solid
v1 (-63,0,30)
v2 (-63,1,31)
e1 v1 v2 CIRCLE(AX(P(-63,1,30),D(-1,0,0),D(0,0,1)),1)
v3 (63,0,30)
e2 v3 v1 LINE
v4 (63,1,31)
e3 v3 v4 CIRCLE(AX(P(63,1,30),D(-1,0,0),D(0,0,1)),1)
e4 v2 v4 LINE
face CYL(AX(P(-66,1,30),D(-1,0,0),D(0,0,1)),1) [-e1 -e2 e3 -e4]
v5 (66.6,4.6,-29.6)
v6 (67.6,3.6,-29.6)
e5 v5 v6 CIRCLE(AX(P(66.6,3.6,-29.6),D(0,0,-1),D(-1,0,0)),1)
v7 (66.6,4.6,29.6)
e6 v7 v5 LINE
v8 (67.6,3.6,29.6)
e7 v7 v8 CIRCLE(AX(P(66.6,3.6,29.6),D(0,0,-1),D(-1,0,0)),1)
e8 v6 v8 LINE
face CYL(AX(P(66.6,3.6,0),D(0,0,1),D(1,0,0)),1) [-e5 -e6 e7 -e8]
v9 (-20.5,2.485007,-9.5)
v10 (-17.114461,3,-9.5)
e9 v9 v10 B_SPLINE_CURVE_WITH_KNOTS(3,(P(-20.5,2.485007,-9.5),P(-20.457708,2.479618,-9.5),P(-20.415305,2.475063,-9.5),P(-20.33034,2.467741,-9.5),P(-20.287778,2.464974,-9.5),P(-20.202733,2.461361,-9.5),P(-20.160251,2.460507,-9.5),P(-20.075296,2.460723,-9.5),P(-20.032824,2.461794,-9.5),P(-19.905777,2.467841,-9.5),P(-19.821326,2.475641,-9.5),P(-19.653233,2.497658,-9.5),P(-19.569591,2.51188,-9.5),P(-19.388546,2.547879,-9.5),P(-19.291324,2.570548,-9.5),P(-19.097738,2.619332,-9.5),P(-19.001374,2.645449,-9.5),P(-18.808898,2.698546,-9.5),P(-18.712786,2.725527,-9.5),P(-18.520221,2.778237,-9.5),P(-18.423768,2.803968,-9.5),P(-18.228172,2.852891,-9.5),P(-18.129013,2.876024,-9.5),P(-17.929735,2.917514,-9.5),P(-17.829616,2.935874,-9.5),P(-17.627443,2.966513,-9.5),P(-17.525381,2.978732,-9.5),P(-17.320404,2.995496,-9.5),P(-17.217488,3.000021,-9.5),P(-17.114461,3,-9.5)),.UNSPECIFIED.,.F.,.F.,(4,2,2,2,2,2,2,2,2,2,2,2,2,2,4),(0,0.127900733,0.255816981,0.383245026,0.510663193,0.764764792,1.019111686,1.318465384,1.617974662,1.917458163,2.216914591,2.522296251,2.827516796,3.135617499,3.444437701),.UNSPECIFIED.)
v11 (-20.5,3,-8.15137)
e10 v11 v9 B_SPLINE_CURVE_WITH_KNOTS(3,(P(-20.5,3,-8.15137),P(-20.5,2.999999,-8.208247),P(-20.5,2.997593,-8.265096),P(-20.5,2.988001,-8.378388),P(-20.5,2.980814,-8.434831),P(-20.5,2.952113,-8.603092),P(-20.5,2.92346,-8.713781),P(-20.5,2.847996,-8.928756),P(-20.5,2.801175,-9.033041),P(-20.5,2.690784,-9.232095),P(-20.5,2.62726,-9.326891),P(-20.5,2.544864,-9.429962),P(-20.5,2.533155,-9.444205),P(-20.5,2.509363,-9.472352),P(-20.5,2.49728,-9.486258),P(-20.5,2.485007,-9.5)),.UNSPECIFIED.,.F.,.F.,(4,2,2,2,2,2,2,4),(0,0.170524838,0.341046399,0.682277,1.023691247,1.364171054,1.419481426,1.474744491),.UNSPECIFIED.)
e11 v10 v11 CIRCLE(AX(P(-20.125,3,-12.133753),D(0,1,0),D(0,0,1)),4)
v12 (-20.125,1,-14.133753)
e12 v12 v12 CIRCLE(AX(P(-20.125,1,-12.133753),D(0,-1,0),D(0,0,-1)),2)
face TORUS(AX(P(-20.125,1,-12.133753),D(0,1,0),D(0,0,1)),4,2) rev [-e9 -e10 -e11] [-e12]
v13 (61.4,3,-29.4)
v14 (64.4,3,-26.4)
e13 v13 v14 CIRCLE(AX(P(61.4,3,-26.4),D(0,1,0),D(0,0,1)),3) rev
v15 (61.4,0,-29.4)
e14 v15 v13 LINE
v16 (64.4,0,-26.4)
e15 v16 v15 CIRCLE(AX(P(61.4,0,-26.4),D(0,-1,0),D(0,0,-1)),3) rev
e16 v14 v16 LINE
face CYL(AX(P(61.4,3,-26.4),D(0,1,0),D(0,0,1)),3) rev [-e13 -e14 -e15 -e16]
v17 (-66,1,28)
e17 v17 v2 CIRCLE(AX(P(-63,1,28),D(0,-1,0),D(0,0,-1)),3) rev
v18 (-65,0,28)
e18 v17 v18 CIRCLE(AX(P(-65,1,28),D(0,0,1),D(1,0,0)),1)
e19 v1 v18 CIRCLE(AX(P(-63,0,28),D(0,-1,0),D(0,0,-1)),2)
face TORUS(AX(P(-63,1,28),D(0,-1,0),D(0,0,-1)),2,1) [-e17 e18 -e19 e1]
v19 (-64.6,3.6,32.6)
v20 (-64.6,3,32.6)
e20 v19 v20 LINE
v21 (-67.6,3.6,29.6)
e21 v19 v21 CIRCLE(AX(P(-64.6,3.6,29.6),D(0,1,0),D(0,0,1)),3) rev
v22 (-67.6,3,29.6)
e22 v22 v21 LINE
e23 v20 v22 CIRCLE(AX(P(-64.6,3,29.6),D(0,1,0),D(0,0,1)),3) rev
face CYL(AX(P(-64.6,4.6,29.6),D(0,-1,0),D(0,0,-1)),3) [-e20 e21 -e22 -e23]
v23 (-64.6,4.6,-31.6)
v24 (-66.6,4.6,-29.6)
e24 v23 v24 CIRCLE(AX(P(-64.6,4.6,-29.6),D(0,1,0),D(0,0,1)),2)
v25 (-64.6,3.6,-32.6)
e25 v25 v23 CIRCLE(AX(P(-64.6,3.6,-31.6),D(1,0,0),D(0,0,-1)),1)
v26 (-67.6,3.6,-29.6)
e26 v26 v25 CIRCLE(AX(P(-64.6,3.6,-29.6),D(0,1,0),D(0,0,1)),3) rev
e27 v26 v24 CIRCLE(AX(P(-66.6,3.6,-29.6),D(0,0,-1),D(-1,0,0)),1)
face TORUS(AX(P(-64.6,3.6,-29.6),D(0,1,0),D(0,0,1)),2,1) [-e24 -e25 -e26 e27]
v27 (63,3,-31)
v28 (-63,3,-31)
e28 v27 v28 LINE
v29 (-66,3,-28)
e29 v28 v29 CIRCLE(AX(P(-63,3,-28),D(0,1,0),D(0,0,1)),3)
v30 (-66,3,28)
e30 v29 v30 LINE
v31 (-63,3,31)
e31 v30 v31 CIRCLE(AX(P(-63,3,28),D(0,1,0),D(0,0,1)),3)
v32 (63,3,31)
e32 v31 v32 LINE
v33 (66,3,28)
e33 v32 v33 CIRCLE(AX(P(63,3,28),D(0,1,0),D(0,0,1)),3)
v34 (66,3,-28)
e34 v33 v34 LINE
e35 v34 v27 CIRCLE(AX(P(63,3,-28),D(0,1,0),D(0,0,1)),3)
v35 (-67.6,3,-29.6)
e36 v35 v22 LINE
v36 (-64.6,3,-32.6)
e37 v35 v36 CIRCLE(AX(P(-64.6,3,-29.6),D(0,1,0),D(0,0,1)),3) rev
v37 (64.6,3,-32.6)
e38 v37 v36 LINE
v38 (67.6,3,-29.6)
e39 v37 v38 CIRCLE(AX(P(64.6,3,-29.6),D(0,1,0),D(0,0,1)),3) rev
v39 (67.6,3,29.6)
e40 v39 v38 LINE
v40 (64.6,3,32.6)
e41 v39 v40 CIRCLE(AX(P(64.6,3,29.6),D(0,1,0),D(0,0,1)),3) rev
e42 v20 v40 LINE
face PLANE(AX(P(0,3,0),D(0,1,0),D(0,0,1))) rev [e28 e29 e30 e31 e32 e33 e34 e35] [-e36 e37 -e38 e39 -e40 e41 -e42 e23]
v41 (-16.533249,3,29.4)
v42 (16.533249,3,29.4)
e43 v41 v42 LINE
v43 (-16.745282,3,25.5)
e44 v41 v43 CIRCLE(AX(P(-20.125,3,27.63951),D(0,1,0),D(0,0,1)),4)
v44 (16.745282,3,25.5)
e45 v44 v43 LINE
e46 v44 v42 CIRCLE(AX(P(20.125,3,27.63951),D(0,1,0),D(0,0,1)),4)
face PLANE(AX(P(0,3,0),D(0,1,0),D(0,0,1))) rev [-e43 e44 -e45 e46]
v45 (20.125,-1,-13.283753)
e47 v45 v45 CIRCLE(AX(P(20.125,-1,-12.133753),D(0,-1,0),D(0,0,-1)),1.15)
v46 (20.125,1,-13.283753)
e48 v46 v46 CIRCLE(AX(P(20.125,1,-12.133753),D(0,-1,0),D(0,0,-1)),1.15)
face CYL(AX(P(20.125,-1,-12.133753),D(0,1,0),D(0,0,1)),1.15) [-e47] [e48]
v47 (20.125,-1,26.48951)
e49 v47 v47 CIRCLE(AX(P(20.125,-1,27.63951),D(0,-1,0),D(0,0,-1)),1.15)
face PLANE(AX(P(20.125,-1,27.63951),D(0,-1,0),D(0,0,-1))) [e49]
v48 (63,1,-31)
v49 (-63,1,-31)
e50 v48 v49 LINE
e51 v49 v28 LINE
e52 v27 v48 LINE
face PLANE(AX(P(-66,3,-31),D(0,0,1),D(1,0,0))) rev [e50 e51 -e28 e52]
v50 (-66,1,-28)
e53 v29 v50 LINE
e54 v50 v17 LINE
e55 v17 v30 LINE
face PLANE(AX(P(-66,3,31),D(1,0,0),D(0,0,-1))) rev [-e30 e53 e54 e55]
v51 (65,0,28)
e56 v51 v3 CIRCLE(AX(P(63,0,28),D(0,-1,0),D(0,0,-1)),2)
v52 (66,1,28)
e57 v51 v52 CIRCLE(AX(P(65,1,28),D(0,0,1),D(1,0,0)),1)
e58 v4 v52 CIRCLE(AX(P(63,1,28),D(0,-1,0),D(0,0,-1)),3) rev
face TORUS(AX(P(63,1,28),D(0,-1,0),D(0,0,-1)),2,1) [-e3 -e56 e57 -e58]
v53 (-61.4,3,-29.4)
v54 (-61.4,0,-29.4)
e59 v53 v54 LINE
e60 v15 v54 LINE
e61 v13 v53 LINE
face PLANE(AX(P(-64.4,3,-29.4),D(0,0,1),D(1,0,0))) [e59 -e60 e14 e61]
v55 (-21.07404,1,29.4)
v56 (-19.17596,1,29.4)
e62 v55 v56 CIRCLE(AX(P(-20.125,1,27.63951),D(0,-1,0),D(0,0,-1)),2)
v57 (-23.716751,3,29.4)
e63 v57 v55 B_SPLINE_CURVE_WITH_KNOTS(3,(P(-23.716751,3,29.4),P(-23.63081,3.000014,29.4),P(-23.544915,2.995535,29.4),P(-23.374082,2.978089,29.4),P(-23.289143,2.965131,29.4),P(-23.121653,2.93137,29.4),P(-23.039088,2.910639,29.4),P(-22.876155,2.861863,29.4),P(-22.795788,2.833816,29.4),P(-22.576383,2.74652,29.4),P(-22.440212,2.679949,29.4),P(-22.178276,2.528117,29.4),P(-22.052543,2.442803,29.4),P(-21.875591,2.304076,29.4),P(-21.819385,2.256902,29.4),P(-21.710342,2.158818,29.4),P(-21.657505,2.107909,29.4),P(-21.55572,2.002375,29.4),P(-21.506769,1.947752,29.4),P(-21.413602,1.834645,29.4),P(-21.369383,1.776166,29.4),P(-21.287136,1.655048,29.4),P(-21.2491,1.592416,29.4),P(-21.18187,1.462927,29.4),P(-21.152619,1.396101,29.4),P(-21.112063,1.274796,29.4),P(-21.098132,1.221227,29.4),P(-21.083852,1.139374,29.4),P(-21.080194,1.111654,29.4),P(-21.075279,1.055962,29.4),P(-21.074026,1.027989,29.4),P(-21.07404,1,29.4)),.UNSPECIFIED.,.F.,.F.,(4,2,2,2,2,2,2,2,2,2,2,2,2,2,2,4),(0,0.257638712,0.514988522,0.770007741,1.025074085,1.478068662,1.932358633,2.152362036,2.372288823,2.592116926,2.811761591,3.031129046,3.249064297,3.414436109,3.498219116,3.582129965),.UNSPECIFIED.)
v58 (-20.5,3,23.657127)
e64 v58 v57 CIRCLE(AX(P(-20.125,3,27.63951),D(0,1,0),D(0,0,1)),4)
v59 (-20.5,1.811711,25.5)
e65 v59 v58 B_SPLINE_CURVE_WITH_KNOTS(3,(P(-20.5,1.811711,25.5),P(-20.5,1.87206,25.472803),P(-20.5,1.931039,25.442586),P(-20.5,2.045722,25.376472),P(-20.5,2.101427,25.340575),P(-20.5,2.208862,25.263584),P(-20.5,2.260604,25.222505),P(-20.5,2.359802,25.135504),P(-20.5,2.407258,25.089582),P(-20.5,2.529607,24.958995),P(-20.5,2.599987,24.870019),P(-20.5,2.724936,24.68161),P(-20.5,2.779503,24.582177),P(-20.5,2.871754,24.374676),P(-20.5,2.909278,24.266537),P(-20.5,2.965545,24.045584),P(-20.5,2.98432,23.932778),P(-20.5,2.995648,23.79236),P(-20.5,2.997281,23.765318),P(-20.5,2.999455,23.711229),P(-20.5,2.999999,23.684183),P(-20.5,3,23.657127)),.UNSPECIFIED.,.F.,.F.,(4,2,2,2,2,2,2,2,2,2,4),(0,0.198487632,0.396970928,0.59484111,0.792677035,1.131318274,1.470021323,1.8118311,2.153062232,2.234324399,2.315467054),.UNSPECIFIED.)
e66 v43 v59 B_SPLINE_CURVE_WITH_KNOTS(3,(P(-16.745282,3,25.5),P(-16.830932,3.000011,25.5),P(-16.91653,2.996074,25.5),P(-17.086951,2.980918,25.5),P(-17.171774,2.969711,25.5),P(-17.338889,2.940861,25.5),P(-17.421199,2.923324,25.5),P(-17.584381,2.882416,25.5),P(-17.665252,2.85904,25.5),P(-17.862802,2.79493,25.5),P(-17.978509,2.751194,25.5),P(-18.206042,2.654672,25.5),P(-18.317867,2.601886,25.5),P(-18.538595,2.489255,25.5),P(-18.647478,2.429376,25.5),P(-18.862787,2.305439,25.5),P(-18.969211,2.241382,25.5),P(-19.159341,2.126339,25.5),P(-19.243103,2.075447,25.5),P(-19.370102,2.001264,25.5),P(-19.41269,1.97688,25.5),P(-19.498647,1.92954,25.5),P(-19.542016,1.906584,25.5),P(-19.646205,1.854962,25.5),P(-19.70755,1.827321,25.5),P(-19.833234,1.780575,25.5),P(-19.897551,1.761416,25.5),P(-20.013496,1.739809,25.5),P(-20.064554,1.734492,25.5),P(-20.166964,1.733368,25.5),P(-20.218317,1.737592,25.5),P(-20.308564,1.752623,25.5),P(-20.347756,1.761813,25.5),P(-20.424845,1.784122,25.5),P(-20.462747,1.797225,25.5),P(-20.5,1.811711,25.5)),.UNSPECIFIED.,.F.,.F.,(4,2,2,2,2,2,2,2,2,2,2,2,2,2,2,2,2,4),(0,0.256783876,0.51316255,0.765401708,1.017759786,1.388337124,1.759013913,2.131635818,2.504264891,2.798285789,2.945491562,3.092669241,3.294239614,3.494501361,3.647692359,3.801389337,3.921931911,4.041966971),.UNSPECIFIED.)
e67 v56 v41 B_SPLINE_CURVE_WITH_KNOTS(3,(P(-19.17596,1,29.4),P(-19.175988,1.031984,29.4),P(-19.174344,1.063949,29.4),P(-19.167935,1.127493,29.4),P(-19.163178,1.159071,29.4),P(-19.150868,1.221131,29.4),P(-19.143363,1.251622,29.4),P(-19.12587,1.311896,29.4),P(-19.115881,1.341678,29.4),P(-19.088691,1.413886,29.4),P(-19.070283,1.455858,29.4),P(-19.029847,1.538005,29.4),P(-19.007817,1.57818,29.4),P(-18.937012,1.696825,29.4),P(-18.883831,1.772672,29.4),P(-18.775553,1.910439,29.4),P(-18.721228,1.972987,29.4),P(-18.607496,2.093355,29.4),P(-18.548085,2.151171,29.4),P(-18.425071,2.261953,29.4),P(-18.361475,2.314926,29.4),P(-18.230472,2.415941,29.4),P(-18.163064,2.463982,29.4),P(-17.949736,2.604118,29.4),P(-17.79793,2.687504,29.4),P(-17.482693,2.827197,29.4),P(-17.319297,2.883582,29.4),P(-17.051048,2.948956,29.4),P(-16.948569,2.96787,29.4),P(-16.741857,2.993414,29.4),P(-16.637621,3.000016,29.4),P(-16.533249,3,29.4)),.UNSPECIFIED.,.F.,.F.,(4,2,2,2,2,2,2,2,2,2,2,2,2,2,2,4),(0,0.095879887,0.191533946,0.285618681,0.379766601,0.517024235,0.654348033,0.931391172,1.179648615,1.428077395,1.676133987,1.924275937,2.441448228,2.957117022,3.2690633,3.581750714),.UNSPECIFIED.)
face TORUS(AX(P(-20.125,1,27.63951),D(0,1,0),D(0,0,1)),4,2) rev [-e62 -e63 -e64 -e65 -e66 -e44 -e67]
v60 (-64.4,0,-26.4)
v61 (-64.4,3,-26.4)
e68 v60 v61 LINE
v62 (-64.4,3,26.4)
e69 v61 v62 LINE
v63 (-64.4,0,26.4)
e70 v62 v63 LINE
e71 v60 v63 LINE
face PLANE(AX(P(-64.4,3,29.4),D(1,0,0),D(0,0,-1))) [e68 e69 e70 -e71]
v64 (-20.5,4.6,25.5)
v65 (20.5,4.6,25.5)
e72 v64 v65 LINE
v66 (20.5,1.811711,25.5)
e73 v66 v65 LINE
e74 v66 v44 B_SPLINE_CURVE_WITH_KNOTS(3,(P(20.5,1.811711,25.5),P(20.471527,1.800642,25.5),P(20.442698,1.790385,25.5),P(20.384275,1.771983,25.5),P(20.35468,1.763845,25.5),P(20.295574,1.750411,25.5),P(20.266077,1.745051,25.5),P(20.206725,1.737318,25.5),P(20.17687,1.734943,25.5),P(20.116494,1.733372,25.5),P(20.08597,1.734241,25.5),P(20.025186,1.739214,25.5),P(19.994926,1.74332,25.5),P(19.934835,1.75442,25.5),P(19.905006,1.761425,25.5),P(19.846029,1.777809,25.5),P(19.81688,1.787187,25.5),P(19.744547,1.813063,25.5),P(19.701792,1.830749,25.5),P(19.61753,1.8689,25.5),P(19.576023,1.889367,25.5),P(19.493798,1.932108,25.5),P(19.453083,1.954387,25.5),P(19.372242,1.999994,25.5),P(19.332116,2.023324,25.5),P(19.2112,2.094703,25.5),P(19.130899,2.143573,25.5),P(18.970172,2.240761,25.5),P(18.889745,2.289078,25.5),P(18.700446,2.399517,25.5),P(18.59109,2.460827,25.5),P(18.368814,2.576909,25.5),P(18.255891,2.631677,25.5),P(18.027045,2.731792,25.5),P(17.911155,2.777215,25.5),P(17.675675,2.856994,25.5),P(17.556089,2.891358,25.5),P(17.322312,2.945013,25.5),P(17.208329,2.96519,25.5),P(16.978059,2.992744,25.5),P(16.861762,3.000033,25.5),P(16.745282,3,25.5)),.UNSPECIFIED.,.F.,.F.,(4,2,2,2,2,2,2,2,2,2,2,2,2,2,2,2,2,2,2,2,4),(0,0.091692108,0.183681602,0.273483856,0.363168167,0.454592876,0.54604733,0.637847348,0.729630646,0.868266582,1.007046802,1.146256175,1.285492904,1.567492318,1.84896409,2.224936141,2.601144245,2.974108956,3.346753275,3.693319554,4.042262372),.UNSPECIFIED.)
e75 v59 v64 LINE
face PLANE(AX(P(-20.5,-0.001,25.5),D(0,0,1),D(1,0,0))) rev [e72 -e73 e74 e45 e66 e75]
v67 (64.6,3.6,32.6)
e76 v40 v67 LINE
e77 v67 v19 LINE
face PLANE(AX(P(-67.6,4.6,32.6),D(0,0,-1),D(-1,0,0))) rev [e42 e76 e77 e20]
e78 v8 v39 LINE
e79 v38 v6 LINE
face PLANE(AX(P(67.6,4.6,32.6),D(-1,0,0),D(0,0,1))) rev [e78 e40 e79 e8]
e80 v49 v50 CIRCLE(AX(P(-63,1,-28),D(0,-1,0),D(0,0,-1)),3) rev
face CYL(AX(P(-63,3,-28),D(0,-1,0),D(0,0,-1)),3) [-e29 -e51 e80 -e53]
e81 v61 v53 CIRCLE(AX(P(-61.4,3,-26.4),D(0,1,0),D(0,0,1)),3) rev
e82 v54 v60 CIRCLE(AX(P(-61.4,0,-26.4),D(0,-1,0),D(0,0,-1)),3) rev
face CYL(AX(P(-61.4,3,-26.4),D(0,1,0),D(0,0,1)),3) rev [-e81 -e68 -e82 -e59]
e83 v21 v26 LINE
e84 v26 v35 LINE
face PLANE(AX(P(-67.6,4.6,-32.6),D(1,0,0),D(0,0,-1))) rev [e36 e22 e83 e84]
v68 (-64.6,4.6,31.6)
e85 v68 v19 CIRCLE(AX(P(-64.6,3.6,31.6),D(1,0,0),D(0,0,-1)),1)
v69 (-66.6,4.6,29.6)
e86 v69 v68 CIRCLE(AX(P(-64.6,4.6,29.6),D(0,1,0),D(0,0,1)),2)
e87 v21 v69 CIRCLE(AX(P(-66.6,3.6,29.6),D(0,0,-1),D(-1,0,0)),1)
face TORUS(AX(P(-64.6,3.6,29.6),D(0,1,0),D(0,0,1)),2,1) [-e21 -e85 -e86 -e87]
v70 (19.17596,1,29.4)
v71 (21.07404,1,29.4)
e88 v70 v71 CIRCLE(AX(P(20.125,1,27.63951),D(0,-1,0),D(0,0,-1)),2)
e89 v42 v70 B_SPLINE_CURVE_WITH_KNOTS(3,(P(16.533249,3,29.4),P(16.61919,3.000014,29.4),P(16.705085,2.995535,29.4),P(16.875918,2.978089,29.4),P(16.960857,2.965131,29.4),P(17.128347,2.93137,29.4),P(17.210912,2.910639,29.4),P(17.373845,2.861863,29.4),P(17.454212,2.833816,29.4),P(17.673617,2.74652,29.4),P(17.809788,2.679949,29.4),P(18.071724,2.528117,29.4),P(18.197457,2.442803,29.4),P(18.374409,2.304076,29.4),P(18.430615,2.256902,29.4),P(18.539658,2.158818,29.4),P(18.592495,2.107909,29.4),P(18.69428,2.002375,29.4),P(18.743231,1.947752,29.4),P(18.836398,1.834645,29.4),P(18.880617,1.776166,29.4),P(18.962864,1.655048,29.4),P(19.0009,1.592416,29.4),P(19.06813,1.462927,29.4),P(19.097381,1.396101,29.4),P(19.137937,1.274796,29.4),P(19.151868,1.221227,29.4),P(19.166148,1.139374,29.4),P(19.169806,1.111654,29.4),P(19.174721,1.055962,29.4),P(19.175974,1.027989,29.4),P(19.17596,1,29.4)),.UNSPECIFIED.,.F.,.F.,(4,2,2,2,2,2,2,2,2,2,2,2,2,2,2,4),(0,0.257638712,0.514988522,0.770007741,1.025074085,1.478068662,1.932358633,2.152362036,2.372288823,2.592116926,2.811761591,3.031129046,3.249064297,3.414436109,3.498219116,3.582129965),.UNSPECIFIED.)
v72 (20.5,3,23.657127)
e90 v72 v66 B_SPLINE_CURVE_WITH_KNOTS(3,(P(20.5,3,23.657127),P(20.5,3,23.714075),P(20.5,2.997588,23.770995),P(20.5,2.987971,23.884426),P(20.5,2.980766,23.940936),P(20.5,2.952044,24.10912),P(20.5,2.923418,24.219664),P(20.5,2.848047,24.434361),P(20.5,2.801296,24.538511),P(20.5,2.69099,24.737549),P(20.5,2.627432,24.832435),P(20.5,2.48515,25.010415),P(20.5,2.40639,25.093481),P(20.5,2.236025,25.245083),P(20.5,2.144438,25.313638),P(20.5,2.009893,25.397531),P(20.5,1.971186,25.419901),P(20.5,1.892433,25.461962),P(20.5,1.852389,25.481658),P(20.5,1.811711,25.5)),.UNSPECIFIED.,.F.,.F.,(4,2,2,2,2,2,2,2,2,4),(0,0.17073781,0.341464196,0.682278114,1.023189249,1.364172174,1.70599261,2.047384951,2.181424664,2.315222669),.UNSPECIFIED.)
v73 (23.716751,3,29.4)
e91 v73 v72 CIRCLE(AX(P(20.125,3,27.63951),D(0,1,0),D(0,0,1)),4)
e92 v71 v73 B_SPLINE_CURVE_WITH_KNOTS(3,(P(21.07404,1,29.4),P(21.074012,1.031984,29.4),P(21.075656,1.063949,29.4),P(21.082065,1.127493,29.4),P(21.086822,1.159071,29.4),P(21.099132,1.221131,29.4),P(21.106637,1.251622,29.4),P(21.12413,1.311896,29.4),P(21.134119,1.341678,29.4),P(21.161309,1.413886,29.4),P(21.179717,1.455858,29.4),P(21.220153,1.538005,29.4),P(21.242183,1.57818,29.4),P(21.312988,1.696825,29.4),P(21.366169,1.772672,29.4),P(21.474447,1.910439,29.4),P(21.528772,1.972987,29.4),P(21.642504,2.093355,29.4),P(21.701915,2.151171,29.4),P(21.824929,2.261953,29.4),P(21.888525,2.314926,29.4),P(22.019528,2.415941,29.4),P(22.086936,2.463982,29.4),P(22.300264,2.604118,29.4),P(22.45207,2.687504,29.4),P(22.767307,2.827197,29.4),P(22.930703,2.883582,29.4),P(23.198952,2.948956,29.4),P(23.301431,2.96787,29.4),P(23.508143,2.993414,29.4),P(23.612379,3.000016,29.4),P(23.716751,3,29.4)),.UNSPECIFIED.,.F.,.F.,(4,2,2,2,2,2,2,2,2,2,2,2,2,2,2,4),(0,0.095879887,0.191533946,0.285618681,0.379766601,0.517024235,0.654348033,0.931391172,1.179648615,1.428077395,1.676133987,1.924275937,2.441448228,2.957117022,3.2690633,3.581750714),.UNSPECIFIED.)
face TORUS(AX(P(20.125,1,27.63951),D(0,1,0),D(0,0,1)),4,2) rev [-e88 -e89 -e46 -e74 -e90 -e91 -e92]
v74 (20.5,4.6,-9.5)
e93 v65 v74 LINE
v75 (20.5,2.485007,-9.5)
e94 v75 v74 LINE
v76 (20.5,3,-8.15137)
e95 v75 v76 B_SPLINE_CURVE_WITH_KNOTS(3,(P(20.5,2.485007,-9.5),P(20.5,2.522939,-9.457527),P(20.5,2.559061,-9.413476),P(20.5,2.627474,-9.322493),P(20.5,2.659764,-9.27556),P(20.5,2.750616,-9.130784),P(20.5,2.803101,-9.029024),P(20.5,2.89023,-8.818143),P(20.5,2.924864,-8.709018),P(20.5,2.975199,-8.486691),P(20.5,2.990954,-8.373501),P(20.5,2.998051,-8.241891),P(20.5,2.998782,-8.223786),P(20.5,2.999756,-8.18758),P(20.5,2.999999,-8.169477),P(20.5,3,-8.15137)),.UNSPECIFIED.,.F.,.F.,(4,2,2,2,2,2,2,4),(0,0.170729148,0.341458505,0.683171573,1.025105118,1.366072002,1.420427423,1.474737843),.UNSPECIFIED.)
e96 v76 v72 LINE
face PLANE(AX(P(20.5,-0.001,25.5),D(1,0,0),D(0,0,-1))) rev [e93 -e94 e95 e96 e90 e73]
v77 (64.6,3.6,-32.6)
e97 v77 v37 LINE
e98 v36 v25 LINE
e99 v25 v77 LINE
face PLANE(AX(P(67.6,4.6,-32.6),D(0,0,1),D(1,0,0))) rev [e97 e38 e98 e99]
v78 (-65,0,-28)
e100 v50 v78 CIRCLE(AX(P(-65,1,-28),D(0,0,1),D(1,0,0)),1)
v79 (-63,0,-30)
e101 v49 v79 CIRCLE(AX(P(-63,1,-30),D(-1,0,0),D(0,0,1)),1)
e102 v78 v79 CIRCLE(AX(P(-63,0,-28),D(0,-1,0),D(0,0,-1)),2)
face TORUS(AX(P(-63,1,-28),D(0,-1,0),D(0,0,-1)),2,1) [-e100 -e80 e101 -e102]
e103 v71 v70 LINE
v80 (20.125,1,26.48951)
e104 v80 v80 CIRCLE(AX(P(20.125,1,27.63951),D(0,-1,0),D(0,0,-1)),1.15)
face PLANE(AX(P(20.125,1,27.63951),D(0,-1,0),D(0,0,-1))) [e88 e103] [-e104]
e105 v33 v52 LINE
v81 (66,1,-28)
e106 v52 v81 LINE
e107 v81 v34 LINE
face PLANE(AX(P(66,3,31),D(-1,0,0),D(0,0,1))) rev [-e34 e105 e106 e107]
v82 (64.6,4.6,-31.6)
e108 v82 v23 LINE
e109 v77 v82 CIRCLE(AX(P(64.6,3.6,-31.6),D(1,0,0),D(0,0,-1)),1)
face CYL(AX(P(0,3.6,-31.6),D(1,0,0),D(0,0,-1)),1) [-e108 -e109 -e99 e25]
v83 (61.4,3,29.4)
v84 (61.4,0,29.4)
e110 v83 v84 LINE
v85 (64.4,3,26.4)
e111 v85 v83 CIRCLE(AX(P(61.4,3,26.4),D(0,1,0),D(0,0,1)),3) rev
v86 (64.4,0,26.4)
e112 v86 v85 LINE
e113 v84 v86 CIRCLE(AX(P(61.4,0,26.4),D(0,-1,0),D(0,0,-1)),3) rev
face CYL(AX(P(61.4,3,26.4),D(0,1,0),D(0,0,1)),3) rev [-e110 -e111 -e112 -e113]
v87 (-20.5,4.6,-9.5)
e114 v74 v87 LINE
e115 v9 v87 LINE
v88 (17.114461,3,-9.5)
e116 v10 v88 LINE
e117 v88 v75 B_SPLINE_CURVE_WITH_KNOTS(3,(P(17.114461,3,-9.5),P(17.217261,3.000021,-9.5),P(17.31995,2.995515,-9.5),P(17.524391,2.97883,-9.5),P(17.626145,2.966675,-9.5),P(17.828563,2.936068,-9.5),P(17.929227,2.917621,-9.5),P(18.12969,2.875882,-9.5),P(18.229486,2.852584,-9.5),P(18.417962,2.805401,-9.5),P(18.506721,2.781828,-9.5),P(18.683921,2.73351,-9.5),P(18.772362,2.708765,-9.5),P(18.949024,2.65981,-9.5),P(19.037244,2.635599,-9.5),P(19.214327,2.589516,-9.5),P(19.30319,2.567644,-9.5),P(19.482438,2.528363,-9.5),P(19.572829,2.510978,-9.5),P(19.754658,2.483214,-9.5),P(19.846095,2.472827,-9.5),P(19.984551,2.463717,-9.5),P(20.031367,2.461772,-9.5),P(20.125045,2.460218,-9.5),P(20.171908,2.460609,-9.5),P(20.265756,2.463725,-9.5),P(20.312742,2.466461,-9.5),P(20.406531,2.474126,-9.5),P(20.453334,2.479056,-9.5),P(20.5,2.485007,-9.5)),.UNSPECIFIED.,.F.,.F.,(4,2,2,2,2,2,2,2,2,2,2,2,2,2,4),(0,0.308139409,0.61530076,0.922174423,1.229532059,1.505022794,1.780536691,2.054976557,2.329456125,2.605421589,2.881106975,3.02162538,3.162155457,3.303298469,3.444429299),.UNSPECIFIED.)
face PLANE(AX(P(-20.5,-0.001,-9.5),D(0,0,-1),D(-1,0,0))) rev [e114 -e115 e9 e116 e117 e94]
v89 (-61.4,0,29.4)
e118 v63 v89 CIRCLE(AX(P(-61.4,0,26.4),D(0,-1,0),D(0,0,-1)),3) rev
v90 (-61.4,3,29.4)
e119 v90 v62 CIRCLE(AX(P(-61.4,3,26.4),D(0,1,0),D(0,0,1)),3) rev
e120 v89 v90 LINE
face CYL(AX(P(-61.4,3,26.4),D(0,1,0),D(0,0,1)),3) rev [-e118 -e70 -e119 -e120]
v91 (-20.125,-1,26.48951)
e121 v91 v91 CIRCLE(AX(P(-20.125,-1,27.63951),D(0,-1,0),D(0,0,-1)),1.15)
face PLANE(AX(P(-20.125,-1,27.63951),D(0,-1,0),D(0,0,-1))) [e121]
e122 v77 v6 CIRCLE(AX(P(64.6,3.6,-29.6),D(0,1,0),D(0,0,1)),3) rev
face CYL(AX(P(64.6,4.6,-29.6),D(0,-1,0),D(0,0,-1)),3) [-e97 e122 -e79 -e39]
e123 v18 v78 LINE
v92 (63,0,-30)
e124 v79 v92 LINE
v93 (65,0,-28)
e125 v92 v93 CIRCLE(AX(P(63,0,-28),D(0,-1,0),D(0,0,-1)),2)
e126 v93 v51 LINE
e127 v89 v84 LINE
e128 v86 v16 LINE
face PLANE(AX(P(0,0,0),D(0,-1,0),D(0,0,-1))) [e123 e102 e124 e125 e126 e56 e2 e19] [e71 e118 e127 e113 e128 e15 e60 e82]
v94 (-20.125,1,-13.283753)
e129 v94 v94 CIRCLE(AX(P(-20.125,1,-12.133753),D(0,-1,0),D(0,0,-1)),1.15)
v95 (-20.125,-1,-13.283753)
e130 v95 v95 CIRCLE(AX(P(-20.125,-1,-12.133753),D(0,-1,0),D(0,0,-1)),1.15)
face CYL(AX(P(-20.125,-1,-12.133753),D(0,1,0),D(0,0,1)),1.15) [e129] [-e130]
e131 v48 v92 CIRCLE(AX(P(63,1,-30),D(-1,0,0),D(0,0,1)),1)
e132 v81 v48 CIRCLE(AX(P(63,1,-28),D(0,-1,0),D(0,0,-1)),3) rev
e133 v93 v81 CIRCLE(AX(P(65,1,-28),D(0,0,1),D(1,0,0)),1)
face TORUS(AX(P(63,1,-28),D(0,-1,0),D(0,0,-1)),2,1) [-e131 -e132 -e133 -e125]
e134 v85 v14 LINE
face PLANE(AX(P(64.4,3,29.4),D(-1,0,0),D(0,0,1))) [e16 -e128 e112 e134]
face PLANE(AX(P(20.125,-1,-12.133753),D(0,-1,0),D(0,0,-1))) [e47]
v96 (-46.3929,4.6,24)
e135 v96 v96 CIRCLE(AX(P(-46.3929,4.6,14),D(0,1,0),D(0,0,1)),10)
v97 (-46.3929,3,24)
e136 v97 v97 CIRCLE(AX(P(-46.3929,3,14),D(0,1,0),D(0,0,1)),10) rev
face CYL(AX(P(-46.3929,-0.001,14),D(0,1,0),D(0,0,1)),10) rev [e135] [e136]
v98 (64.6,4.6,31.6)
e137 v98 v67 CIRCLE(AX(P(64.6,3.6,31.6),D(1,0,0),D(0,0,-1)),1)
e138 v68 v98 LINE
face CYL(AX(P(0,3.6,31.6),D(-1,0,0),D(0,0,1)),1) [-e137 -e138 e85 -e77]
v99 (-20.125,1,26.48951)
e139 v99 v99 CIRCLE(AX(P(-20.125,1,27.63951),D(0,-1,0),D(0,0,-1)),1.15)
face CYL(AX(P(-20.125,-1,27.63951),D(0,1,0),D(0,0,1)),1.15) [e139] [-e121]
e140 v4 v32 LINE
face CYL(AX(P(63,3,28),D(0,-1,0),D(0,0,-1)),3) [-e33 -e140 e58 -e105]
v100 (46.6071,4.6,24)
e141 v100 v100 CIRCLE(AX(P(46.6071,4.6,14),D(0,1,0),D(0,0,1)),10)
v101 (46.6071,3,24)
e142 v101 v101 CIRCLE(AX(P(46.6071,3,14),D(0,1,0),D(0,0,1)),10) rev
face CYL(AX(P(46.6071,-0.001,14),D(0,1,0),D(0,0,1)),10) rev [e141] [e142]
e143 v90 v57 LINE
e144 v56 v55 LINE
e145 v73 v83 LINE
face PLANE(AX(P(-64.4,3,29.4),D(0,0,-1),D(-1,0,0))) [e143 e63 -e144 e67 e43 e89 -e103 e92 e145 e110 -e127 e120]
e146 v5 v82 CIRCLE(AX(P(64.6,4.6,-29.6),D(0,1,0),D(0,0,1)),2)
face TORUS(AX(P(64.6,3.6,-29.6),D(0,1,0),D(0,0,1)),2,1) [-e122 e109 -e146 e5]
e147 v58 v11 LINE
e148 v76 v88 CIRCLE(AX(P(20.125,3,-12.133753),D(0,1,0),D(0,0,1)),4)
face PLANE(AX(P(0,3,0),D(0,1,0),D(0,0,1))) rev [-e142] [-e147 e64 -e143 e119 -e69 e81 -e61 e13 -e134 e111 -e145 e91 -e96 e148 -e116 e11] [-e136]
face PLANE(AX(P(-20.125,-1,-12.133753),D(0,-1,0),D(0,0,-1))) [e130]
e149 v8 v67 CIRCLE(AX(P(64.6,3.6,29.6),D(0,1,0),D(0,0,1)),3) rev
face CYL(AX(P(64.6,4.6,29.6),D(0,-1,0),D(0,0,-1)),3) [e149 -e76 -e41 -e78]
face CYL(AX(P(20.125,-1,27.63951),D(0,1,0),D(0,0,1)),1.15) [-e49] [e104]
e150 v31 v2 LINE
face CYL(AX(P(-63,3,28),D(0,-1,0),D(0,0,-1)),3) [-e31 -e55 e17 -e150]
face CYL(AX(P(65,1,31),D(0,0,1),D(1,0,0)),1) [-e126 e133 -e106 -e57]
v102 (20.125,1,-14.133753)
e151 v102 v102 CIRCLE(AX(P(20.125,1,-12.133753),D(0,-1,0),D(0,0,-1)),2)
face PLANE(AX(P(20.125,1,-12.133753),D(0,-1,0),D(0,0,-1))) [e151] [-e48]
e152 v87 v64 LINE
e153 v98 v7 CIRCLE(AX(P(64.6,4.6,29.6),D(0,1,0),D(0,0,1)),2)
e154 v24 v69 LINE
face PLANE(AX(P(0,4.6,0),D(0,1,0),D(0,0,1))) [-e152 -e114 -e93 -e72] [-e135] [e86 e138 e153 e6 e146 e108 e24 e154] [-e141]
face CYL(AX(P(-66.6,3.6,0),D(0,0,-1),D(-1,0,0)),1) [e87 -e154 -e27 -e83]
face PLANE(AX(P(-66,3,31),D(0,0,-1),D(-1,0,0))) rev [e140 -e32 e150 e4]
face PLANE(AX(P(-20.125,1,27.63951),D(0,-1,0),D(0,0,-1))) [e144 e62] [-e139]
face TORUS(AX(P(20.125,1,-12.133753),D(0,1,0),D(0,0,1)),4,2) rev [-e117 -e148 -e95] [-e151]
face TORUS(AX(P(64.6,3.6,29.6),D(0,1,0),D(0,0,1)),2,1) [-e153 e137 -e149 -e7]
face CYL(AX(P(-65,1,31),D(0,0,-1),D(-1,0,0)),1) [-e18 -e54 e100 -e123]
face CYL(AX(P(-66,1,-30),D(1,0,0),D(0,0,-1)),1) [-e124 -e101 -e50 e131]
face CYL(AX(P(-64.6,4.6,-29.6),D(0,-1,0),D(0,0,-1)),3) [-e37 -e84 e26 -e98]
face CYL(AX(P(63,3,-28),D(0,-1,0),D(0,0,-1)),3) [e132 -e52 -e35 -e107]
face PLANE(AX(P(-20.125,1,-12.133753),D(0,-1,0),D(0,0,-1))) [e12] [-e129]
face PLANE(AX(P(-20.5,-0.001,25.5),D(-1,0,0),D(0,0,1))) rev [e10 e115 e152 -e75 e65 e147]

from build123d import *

# Parameters (mm, degrees)
SKETCH1_W           = 132
SKETCH1_H           = 62
SKETCH1_W_2         = 128.8
SKETCH1_H_2         = 58.8
BOSS_EXTRUDE1_DEPTH = 3
SKETCH3_W           = 135.2
SKETCH3_H           = 65.2
BOSS_EXTRUDE3_DEPTH = 1.6
FILLET2_R           = 3
CUT_EXTRUDE1_REACH  = 77.191
SKETCH4_R           = 10
FILLET3_R           = 1
FILLET4_R           = 1
CUT_EXTRUDE2_REACH  = 77.191
SKETCH5_W           = 41
SKETCH5_H           = 35
SKETCH6_R           = 2
BOSS_EXTRUDE4_DEPTH = 2
SKETCH7_R           = 1.15
BOSS_EXTRUDE5_DEPTH = 2
FILLET5_R           = 2


with BuildPart() as part:
    # Sketch1 → Boss-Extrude1 (new body)
    with BuildSketch(Plane(origin=(0, 0, 0), x_dir=(1, 0, 0), z_dir=(0, 1, 0))):
        Rectangle(SKETCH1_W, SKETCH1_H)
        Rectangle(SKETCH1_W_2, SKETCH1_H_2, mode=Mode.SUBTRACT)
    extrude(amount=BOSS_EXTRUDE1_DEPTH)

    # Sketch3 → Boss-Extrude3 (add)
    with BuildSketch(Plane(origin=(0, 3, 0), x_dir=(1, 0, 0), z_dir=(0, 1, 0))):
        Rectangle(SKETCH3_W, SKETCH3_H)
    extrude(amount=BOSS_EXTRUDE3_DEPTH)

    # Fillet2
    fillet2_edges = [part.edges().sort_by_distance(p)[0] for p in [
        (-64.4, 1.5, 29.4),
        (64.4, 1.5, 29.4),
        (64.4, 1.5, -29.4),
        (-64.4, 1.5, -29.4),
        (-67.6, 3.8, 32.6),
        (67.6, 3.8, 32.6),
        (67.6, 3.8, -32.6),
        (-67.6, 3.8, -32.6),
        (66, 1.5, 31),
        (-66, 1.5, 31),
        (-66, 1.5, -31),
        (66, 1.5, -31),
    ]]
    fillet(fillet2_edges, radius=FILLET2_R)

    # Sketch4 → Cut-Extrude1 (cut, up to next)
    with BuildSketch(Plane(origin=(0, 4.6, 0), x_dir=(1, 0, 0), z_dir=(0, 1, 0)), mode=Mode.PRIVATE) as cut_extrude1_sk1:
        with Locations(Location((-46.3929, -14, 0), (0, 0, 270))):
            Circle(SKETCH4_R)
    cut_extrude1_tool1 = extrude(cut_extrude1_sk1.sketch, amount=-CUT_EXTRUDE1_REACH, mode=Mode.PRIVATE) & part.part
    # Sketch4 → Cut-Extrude1 (cut, up to next)
    with BuildSketch(Plane(origin=(0, 4.6, 0), x_dir=(1, 0, 0), z_dir=(0, 1, 0)), mode=Mode.PRIVATE) as cut_extrude1_sk2:
        with Locations(Location((46.6071, -14, 0), (0, 0, 270))):
            Circle(SKETCH4_R)
    cut_extrude1_tool2 = extrude(cut_extrude1_sk2.sketch, amount=-CUT_EXTRUDE1_REACH, mode=Mode.PRIVATE) & part.part
    add(cut_extrude1_tool1.solids().sort_by_distance((-46.3929, 4.6, 14))[0], mode=Mode.SUBTRACT)
    add(cut_extrude1_tool2.solids().sort_by_distance((46.6071, 4.6, 14))[0], mode=Mode.SUBTRACT)

    # Fillet3
    fillet3_edges = [part.edges().sort_by_distance(p)[0] for p in [
        (0, 4.6, -32.6),
        (67.6, 4.6, 0),
        (0, 4.6, 32.6),
        (-67.6, 4.6, 0),
        (-66.721320344, 4.6, 31.721320344),
        (-66.721320344, 4.6, -31.721320344),
        (66.721320344, 4.6, 31.721320344),
        (66.721320344, 4.6, -31.721320344),
    ]]
    fillet(fillet3_edges, radius=FILLET3_R)

    # Fillet4
    fillet4_edges = [part.edges().sort_by_distance(p)[0] for p in [
        (0, 0, -31),
        (66, 0, 0),
        (0, 0, 31),
        (-66, 0, 0),
        (-65.121320344, 0, 30.121320344),
        (-65.121320344, 0, -30.121320344),
        (65.121320344, 0, 30.121320344),
        (65.121320344, 0, -30.121320344),
    ]]
    fillet(fillet4_edges, radius=FILLET4_R)

    # Sketch5 → Cut-Extrude2 (cut, up to next)
    with BuildSketch(Plane(origin=(0, 4.6, 0), x_dir=(1, 0, 0), z_dir=(0, 1, 0)), mode=Mode.PRIVATE) as cut_extrude2_sk1:
        with Locations((0, -8)):
            Rectangle(SKETCH5_W, SKETCH5_H)
    cut_extrude2_tool1 = extrude(cut_extrude2_sk1.sketch, amount=-CUT_EXTRUDE2_REACH, mode=Mode.PRIVATE) & part.part
    add(cut_extrude2_tool1.solids().sort_by_distance((0, 4.6, 8))[0], mode=Mode.SUBTRACT)

    # Sketch6 → Boss-Extrude4 (add)
    with BuildSketch(Plane.XZ.offset(-3)):
        with Locations(Location((-20.125, -12.133753118, 0), (0, 0, 90))):
            Circle(SKETCH6_R)
        with Locations((-20.125, 27.639510402)):
            Circle(SKETCH6_R)
        with Locations((20.125, 27.639510402)):
            Circle(SKETCH6_R)
        with Locations(Location((20.125, -12.133753118, 0), (0, 0, 90))):
            Circle(SKETCH6_R)
    extrude(amount=BOSS_EXTRUDE4_DEPTH)

    # Sketch7 → Boss-Extrude5 (add)
    with BuildSketch(Plane.XZ.offset(-1)):
        with Locations(Location((-20.125, 27.639510402, 0), (0, 0, 270))):
            Circle(SKETCH7_R)
        with Locations(Location((20.125, 27.639510402, 0), (0, 0, 270))):
            Circle(SKETCH7_R)
        with Locations(Location((-20.125, -12.133753118, 0), (0, 0, 270))):
            Circle(SKETCH7_R)
        with Locations(Location((20.125, -12.133753118, 0), (0, 0, 270))):
            Circle(SKETCH7_R)
    extrude(amount=BOSS_EXTRUDE5_DEPTH)

    # Fillet5
    # the kernel refuses this fillet: 2 mm, written as the material it adds along each edge
    with BuildSketch(Plane(origin=(20.125, 3, 27.639510402), x_dir=(0.003141587485838926, 0, 0.9999950652018583), z_dir=(-0.9999950652018583, 0, 0.003141587485838926))) as fillet5_piece_1_section:
        with BuildLine():
            CenterArc((2 + FILLET5_R, -FILLET5_R), FILLET5_R, 90, 90)
            Line((2, -FILLET5_R), (2, 0))
            Line((2, 0), (2 + FILLET5_R, 0))
        make_face()
    fillet5_piece_1 = revolve(axis=Axis((20.125, 3, 27.639510402), (0, 1, 0)), revolution_arc=359.64, mode=Mode.PRIVATE)
    fillet5_piece_1 = split(fillet5_piece_1, bisect_by=Plane(origin=(22.155432761, 2.539514878, 29.4), z_dir=(0, 0, -1)), keep=Keep.TOP, mode=Mode.PRIVATE)
    fillet5_piece_1 = split(fillet5_piece_1, bisect_by=Plane(origin=(22.155432761, 2.539514878, 25.5), z_dir=(0, 0, 1)), keep=Keep.TOP, mode=Mode.PRIVATE)
    add(fillet5_piece_1)
    with BuildSketch(Plane(origin=(20.125, 3, 27.639510402), x_dir=(0.003141587485838926, 0, 0.9999950652018583), z_dir=(-0.9999950652018583, 0, 0.003141587485838926))) as fillet5_piece_2_section:
        with BuildLine():
            CenterArc((2 + FILLET5_R, -FILLET5_R), FILLET5_R, 90, 90)
            Line((2, -FILLET5_R), (2, 0))
            Line((2, 0), (2 + FILLET5_R, 0))
        make_face()
    fillet5_piece_2 = revolve(axis=Axis((20.125, 3, 27.639510402), (0, 1, 0)), revolution_arc=359.64, mode=Mode.PRIVATE)
    fillet5_piece_2 = split(fillet5_piece_2, bisect_by=Plane(origin=(20.5, 2.773825657, 25.100890484), z_dir=(1, 0, 0)), keep=Keep.TOP, mode=Mode.PRIVATE)
    fillet5_piece_2 = split(fillet5_piece_2, bisect_by=Plane(origin=(21.236754387, 2.773825657, 25.5), z_dir=(0, 0, -1)), keep=Keep.TOP, mode=Mode.PRIVATE)
    add(fillet5_piece_2)
    with BuildSketch(Plane(origin=(-20.125, 3, 27.639510402), x_dir=(0.0031415874858371495, 0, 0.9999950652018583), z_dir=(-0.9999950652018583, 0, 0.0031415874858371495))) as fillet5_piece_3_section:
        with BuildLine():
            CenterArc((2 + FILLET5_R, -FILLET5_R), FILLET5_R, 90, 90)
            Line((2, -FILLET5_R), (2, 0))
            Line((2, 0), (2 + FILLET5_R, 0))
        make_face()
    fillet5_piece_3 = revolve(axis=Axis((-20.125, 3, 27.639510402), (0, 1, 0)), revolution_arc=359.64, mode=Mode.PRIVATE)
    fillet5_piece_3 = split(fillet5_piece_3, bisect_by=Plane(origin=(-17.69928118, 2.425603433, 29.4), z_dir=(0, 0, -1)), keep=Keep.TOP, mode=Mode.PRIVATE)
    fillet5_piece_3 = split(fillet5_piece_3, bisect_by=Plane(origin=(-17.69928118, 2.425603433, 25.5), z_dir=(0, 0, 1)), keep=Keep.TOP, mode=Mode.PRIVATE)
    add(fillet5_piece_3)
    with BuildSketch(Plane(origin=(-20.125, 3, 27.639510402), x_dir=(0.0031415874858371495, 0, 0.9999950652018583), z_dir=(-0.9999950652018583, 0, 0.0031415874858371495))) as fillet5_piece_4_section:
        with BuildLine():
            CenterArc((2 + FILLET5_R, -FILLET5_R), FILLET5_R, 90, 90)
            Line((2, -FILLET5_R), (2, 0))
            Line((2, 0), (2 + FILLET5_R, 0))
        make_face()
    fillet5_piece_4 = revolve(axis=Axis((-20.125, 3, 27.639510402), (0, 1, 0)), revolution_arc=359.64, mode=Mode.PRIVATE)
    fillet5_piece_4 = split(fillet5_piece_4, bisect_by=Plane(origin=(-21.236754422, 2.773825532, 25.5), z_dir=(0, 0, -1)), keep=Keep.TOP, mode=Mode.PRIVATE)
    fillet5_piece_4 = split(fillet5_piece_4, bisect_by=Plane(origin=(-20.5, 2.773825532, 25.100890528), z_dir=(-1, 0, 0)), keep=Keep.TOP, mode=Mode.PRIVATE)
    add(fillet5_piece_4)
    with BuildSketch(Plane(origin=(-20.125, 3, -12.133753118), x_dir=(0, 0, 1), z_dir=(1, 0, 0))) as fillet5_piece_5_section:
        with BuildLine():
            CenterArc((2 + FILLET5_R, FILLET5_R), FILLET5_R, 180, 90)
            Line((2, FILLET5_R), (2, 0))
            Line((2, 0), (2 + FILLET5_R, 0))
        make_face()
    fillet5_piece_5 = revolve(axis=Axis((-20.125, 3, -12.133753118), (0, -1, 0)), mode=Mode.PRIVATE)
    fillet5_piece_5 = split(fillet5_piece_5, bisect_by=Plane(origin=(-20.327948227, 1.82031668, -9.5), z_dir=(0, 0, -1)), keep=Keep.TOP, mode=Mode.PRIVATE)
    add(fillet5_piece_5)
    with BuildSketch(Plane(origin=(-20.125, 3, -12.133753118), x_dir=(0, 0, 1), z_dir=(1, 0, 0))) as fillet5_piece_6_section:
        with BuildLine():
            CenterArc((2 + FILLET5_R, FILLET5_R), FILLET5_R, 180, 90)
            Line((2, FILLET5_R), (2, 0))
            Line((2, 0), (2 + FILLET5_R, 0))
        make_face()
    fillet5_piece_6 = revolve(axis=Axis((-20.125, 3, -12.133753118), (0, -1, 0)), mode=Mode.PRIVATE)
    fillet5_piece_6 = split(fillet5_piece_6, bisect_by=Plane(origin=(-20.5, 2.890749486, -9.205697252), z_dir=(-1, 0, 0)), keep=Keep.TOP, mode=Mode.PRIVATE)
    add(fillet5_piece_6)
    with BuildSketch(Plane(origin=(20.125, 3, -12.133753118), x_dir=(0, 0, 1), z_dir=(1, 0, 0))) as fillet5_piece_7_section:
        with BuildLine():
            CenterArc((2 + FILLET5_R, FILLET5_R), FILLET5_R, 180, 90)
            Line((2, FILLET5_R), (2, 0))
            Line((2, 0), (2 + FILLET5_R, 0))
        make_face()
    fillet5_piece_7 = revolve(axis=Axis((20.125, 3, -12.133753118), (0, -1, 0)), mode=Mode.PRIVATE)
    fillet5_piece_7 = split(fillet5_piece_7, bisect_by=Plane(origin=(17.564077298, 2.427646473, -9.5), z_dir=(0, 0, -1)), keep=Keep.TOP, mode=Mode.PRIVATE)
    add(fillet5_piece_7)
    with BuildSketch(Plane(origin=(20.125, 3, -12.133753118), x_dir=(0, 0, 1), z_dir=(1, 0, 0))) as fillet5_piece_8_section:
        with BuildLine():
            CenterArc((2 + FILLET5_R, FILLET5_R), FILLET5_R, 180, 90)
            Line((2, FILLET5_R), (2, 0))
            Line((2, 0), (2 + FILLET5_R, 0))
        make_face()
    fillet5_piece_8 = revolve(axis=Axis((20.125, 3, -12.133753118), (0, -1, 0)), mode=Mode.PRIVATE)
    fillet5_piece_8 = split(fillet5_piece_8, bisect_by=Plane(origin=(20.5, 2.890749599, -9.205696985), z_dir=(1, 0, 0)), keep=Keep.TOP, mode=Mode.PRIVATE)
    add(fillet5_piece_8)


solid = part.part
